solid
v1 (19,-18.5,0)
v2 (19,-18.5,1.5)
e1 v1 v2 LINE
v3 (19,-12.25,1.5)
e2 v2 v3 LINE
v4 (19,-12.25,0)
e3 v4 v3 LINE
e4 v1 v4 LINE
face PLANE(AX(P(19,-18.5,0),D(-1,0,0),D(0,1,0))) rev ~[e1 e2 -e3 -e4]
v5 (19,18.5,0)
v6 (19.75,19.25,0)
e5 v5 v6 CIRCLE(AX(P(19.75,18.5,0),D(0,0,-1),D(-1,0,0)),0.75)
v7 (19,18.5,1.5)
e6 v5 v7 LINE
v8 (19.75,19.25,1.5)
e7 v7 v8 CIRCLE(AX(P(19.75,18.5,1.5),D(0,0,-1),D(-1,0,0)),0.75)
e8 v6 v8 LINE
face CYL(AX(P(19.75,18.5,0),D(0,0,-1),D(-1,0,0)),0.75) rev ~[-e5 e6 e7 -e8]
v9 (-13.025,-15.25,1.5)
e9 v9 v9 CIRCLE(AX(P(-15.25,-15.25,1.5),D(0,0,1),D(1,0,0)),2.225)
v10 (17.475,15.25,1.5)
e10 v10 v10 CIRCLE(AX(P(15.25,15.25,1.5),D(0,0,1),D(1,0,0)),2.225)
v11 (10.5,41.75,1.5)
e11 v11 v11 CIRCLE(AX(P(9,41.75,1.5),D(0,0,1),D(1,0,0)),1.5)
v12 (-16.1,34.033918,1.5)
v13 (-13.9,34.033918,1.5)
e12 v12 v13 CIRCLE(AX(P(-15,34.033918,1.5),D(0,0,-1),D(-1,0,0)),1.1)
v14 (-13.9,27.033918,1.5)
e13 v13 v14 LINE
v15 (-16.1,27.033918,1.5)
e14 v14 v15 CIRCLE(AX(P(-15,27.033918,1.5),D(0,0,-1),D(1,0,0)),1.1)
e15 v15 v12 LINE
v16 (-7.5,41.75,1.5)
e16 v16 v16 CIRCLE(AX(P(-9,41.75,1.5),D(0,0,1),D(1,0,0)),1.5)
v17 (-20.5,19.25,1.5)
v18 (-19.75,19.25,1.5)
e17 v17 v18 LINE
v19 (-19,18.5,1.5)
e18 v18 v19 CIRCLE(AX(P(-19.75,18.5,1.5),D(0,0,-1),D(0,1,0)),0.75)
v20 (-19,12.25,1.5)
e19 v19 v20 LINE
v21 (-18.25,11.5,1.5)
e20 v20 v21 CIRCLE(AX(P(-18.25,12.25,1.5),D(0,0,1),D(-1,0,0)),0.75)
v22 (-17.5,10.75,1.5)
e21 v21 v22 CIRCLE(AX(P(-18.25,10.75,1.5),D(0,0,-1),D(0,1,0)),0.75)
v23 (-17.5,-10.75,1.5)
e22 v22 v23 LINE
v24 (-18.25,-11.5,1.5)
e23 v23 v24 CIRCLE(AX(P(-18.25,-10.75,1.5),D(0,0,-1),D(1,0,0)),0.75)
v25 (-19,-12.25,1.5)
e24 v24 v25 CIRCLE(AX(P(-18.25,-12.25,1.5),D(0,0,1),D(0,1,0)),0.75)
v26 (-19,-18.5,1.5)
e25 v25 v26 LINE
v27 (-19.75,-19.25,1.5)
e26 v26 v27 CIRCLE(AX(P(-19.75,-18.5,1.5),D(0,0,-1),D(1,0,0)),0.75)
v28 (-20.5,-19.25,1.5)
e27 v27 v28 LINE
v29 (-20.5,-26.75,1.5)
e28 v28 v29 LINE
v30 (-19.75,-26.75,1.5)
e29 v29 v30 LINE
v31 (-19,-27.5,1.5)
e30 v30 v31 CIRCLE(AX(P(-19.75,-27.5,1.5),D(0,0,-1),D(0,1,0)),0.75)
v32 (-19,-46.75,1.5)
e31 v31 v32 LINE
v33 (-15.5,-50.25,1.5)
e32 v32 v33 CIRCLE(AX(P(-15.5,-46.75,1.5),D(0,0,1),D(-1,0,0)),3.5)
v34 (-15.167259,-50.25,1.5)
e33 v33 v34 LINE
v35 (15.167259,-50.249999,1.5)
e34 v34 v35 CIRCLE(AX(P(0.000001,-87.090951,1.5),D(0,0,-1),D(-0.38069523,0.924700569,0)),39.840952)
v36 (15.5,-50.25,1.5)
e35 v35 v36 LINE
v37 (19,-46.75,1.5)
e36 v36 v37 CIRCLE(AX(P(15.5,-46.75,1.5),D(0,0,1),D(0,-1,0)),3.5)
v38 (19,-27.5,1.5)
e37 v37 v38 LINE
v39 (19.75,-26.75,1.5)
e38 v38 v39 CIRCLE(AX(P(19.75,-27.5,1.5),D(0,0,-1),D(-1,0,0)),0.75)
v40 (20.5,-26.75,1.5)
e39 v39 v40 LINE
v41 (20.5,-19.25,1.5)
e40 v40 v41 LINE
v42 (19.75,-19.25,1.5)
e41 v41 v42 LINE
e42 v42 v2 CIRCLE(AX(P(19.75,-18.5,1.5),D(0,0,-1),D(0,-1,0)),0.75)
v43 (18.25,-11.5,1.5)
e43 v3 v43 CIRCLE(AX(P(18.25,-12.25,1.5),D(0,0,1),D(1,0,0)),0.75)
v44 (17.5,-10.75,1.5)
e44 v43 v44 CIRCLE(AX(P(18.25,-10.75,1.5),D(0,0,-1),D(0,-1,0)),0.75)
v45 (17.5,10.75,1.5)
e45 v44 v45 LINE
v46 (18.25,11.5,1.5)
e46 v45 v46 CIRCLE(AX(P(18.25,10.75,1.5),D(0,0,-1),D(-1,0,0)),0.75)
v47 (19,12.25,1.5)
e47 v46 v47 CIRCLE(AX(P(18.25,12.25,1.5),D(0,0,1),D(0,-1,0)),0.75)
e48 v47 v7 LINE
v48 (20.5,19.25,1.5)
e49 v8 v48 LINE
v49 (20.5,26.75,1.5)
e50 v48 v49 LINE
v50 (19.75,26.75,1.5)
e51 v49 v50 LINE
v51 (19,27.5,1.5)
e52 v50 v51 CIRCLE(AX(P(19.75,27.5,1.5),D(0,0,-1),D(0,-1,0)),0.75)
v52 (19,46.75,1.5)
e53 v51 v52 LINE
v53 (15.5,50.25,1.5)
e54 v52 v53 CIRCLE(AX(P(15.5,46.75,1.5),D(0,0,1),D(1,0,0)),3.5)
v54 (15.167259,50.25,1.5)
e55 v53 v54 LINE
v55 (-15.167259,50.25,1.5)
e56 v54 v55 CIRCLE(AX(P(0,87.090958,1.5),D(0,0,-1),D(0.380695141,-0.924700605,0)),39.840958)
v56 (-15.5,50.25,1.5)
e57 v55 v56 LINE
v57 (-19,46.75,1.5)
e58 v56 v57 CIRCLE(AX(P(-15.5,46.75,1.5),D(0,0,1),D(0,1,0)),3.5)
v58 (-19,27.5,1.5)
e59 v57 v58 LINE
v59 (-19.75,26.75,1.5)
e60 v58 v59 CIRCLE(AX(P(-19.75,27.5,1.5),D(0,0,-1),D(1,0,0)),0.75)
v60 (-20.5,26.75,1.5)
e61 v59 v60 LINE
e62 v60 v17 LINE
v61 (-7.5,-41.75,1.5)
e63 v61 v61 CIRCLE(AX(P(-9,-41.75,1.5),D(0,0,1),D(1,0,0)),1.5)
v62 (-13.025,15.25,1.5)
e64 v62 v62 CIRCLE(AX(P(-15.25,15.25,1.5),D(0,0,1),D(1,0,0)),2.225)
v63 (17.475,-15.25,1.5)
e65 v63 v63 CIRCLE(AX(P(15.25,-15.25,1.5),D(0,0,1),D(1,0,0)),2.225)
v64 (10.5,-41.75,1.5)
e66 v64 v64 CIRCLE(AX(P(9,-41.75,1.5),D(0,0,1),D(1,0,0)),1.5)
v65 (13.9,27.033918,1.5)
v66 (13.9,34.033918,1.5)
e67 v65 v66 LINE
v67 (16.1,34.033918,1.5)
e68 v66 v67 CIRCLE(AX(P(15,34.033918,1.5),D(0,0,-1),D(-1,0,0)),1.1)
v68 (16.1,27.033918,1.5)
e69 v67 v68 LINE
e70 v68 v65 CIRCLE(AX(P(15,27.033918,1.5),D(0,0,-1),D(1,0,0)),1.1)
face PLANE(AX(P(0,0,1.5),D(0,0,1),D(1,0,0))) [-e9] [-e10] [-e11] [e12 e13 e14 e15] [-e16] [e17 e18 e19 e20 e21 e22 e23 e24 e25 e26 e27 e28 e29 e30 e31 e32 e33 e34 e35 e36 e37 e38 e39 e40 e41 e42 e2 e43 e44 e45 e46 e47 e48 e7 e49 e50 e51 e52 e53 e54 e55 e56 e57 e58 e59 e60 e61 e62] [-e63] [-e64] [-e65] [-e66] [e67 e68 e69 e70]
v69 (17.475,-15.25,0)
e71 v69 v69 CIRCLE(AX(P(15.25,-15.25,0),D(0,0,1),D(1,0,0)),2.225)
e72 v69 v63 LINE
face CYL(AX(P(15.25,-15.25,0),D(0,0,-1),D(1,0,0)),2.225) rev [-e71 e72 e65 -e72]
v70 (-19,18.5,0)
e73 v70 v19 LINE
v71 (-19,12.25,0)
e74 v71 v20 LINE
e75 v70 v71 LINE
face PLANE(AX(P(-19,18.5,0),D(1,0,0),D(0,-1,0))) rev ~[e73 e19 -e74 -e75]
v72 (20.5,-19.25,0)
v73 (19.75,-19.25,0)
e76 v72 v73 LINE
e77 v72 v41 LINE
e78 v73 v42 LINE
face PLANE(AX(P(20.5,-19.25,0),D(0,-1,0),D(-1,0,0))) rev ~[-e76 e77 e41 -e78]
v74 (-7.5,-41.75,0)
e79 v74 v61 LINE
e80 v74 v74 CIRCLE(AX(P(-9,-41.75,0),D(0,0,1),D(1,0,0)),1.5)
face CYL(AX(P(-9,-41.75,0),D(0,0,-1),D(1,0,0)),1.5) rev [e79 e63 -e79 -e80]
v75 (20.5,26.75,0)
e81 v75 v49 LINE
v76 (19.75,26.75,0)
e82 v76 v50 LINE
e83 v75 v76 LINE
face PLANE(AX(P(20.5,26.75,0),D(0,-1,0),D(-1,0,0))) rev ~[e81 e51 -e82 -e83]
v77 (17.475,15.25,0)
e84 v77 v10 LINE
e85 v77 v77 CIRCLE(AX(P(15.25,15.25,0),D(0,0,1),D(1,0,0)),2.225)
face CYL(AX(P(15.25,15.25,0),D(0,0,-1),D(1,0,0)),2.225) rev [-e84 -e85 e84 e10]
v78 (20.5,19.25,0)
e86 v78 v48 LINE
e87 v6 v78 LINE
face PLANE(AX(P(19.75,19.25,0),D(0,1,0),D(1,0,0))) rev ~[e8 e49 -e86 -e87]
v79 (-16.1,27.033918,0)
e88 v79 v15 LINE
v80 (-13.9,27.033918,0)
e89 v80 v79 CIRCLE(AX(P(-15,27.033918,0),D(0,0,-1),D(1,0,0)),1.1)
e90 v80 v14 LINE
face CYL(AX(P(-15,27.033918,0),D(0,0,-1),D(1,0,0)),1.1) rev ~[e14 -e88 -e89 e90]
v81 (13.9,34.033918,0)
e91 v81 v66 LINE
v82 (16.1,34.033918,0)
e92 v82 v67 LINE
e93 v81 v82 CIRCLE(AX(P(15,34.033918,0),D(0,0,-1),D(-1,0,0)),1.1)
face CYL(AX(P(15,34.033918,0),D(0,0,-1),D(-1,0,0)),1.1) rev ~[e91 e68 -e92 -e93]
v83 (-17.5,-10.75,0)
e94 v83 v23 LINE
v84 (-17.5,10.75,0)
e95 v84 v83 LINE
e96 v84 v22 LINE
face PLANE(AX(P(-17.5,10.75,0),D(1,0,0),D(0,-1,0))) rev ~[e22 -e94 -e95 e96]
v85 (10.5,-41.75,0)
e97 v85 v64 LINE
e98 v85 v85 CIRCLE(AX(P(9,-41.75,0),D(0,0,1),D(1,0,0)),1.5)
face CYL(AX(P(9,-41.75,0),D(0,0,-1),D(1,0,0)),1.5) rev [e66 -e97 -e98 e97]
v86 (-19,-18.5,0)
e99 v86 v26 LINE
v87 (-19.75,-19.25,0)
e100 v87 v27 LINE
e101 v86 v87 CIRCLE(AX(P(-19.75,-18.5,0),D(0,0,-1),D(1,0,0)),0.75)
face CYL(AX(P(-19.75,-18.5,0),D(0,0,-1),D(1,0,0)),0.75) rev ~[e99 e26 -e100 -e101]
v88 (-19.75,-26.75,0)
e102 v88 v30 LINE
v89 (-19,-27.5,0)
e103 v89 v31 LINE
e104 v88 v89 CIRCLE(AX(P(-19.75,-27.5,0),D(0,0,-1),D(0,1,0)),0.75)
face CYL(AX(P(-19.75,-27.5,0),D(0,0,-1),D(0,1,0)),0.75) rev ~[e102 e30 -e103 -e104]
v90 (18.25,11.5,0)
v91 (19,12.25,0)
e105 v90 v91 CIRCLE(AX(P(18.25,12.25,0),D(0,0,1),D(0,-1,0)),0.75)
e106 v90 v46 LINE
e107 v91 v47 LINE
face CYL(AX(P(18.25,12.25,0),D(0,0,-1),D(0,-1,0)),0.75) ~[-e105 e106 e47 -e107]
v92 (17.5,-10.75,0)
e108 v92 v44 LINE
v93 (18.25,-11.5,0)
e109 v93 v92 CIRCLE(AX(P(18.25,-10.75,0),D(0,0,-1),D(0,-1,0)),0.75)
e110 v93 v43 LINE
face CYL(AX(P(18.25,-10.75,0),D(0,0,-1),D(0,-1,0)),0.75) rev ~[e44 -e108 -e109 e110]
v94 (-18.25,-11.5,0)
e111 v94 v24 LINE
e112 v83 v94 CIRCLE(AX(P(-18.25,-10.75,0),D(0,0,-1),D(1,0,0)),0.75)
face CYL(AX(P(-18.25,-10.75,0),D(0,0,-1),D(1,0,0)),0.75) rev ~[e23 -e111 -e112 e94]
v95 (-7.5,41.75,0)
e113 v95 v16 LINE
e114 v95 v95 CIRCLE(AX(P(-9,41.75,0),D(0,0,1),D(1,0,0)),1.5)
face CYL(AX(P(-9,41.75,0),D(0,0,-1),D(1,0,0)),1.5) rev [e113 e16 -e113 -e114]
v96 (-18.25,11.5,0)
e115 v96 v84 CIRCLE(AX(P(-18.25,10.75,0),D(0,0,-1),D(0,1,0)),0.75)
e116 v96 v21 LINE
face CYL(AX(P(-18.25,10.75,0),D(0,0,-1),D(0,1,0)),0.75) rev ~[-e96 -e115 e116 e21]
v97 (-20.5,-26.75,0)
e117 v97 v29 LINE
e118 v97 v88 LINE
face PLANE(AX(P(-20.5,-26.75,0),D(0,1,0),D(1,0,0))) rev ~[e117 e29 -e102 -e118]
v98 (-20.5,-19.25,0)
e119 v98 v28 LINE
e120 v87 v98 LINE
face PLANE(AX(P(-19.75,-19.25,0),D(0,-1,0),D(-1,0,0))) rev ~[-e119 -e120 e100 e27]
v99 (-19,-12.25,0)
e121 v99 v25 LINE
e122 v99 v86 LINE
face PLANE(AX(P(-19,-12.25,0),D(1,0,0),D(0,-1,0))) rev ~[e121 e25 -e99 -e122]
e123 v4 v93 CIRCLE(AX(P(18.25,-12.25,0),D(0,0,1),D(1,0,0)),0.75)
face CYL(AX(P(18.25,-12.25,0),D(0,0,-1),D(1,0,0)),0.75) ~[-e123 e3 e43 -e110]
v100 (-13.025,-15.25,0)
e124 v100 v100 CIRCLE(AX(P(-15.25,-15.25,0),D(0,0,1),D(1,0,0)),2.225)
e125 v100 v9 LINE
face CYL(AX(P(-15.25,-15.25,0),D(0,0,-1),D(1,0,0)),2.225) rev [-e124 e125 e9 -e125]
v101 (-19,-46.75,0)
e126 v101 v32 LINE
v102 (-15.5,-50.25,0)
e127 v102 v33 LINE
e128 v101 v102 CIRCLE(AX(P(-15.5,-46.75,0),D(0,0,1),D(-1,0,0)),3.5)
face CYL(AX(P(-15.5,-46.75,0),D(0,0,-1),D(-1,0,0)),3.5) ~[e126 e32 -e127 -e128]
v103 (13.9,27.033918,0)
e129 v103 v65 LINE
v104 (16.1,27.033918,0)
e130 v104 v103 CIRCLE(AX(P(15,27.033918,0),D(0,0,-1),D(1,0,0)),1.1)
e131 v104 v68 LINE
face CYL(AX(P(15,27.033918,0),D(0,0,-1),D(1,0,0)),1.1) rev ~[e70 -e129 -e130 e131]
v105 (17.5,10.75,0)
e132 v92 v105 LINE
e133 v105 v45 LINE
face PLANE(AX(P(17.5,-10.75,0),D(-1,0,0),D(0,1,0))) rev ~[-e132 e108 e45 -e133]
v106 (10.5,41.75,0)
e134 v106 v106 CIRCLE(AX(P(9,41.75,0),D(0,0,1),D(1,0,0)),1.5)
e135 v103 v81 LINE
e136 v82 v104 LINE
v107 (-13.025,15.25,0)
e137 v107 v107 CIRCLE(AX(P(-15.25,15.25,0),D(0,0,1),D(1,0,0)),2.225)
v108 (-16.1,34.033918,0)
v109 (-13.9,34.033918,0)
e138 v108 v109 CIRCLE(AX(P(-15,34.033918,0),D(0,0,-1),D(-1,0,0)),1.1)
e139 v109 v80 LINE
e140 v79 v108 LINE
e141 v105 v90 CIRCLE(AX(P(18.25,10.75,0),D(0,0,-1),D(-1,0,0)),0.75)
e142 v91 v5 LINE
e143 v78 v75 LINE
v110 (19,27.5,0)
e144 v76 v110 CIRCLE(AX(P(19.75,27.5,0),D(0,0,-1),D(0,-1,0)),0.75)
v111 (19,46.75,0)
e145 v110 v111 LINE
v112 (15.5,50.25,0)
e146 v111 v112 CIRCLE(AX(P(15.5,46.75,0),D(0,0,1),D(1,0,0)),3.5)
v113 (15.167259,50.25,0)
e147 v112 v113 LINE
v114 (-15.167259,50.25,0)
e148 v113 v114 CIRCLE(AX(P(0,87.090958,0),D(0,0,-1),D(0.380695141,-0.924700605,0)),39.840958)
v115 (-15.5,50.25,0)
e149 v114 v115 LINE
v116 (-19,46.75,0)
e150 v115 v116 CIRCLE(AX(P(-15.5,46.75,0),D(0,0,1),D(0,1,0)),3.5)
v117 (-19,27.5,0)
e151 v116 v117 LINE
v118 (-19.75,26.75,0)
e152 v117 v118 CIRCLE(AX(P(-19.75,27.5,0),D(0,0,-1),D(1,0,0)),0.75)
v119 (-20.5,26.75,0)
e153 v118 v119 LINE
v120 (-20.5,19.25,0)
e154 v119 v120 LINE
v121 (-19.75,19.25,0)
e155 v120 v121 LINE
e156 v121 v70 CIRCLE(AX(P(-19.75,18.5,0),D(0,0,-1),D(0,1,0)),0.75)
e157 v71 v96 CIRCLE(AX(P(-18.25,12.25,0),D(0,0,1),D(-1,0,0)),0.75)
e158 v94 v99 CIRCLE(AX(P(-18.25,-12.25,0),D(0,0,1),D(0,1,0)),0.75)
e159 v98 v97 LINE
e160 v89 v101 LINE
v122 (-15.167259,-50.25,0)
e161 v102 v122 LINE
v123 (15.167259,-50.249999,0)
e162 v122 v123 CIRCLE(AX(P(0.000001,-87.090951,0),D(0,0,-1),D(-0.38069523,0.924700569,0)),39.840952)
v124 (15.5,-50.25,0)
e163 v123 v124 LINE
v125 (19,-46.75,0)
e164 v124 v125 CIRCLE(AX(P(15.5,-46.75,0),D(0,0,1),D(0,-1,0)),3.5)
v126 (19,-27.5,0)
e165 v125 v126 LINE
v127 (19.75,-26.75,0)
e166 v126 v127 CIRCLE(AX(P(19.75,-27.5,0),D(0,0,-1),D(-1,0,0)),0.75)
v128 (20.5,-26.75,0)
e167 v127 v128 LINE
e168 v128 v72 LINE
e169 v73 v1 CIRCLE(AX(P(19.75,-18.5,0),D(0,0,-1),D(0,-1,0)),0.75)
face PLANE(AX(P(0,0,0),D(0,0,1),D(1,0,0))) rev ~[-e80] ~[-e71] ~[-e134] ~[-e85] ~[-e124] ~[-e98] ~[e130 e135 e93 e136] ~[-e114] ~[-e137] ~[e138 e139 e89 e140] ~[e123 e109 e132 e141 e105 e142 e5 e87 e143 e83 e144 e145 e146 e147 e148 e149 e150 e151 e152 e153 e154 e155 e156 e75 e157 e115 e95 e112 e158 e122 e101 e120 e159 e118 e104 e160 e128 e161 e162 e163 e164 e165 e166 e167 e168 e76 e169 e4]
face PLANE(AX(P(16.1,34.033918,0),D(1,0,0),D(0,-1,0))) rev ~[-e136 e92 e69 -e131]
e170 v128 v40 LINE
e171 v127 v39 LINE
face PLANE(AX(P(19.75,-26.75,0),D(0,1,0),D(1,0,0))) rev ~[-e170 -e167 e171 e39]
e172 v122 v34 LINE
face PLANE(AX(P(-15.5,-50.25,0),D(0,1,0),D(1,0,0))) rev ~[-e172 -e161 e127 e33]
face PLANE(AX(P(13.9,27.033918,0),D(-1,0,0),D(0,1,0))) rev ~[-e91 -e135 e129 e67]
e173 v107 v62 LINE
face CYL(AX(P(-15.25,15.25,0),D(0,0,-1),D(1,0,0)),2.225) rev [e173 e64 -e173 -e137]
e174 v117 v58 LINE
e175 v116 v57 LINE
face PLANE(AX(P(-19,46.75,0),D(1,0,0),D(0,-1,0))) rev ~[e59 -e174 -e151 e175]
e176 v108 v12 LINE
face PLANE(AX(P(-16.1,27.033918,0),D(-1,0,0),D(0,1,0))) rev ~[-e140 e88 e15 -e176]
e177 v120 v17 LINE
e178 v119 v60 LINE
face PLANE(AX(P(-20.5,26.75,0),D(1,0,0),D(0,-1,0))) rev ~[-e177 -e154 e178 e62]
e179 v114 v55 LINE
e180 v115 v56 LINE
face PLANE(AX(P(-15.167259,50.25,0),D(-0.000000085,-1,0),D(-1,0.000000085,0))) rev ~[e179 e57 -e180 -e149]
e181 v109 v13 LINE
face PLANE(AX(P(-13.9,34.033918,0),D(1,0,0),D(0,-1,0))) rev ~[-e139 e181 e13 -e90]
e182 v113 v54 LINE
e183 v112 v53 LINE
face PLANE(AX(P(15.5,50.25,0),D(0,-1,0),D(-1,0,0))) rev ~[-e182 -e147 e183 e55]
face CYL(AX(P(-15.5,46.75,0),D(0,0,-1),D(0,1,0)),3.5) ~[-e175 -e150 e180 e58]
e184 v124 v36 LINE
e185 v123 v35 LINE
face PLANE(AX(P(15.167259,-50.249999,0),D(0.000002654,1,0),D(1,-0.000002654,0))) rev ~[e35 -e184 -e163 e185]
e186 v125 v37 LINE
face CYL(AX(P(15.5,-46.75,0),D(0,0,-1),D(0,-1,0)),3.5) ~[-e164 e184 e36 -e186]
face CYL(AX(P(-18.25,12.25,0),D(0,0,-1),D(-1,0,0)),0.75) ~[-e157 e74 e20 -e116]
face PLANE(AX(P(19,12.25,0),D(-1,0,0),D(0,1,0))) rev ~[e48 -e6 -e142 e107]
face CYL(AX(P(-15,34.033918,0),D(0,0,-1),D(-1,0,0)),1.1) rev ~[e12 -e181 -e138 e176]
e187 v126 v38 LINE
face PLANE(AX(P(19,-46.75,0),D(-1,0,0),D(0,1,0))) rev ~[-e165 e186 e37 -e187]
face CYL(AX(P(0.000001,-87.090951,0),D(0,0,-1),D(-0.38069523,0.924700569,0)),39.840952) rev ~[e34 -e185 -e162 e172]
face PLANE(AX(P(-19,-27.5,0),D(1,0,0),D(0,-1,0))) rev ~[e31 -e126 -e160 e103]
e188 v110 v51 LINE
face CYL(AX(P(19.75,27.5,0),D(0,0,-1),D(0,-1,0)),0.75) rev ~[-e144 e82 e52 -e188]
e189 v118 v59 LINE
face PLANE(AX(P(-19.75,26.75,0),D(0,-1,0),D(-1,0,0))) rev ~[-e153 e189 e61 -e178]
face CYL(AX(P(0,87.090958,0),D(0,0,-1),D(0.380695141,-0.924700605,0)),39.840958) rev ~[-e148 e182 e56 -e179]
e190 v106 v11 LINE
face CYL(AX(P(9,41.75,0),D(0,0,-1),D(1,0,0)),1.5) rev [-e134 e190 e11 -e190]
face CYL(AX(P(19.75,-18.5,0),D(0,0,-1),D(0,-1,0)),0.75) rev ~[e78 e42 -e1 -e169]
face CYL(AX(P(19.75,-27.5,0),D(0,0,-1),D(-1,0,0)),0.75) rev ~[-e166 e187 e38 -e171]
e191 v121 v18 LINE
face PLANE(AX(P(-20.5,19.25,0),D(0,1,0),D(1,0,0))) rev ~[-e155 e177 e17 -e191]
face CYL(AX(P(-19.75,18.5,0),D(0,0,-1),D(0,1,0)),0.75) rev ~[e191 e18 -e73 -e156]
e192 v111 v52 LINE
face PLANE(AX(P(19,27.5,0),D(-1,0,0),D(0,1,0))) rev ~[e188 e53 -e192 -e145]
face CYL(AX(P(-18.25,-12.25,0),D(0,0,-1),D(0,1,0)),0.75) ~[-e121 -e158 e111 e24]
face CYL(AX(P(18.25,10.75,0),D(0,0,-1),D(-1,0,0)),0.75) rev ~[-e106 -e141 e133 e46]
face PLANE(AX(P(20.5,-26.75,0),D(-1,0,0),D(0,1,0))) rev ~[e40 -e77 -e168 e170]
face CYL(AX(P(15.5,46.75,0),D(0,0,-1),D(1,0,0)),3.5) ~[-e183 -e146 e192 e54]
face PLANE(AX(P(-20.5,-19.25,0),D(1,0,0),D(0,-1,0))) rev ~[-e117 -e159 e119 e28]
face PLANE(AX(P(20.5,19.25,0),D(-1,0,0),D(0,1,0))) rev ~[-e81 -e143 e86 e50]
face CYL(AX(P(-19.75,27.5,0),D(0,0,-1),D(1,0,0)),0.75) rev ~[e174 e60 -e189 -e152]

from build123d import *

# Parameters (mm, degrees)
F0_R     = 1.5
F0_R_2   = 2.225
F1_DEPTH = 1.5


# Not quite as in the source:
# - ends of sketch curves that miss each other by under 0.0002 mm in the source are joined


with BuildPart() as f1:
    # F0 (on Top) → F1 (new body)
    with BuildSketch(Plane.XY):
        with BuildLine():
            ThreePointArc((19.75, -19.25), (19.2196699141, -19.0303300859), (19, -18.5))
            Line((19, -18.5), (19, -12.25))
            ThreePointArc((19, -12.25), (18.7803300859, -11.7196699141), (18.25, -11.5))
            ThreePointArc((18.25, -11.5), (17.7196699141, -11.2803300859), (17.5, -10.75))
            Line((17.5, -10.75), (17.5, 10.75))
            ThreePointArc((17.5, 10.75), (17.7196699141, 11.2803300859), (18.25, 11.5))
            ThreePointArc((18.25, 11.5), (18.7803300859, 11.7196699141), (19, 12.25))
            Line((19, 12.25), (19, 18.5))
            ThreePointArc((19, 18.5), (19.2196699141, 19.0303300859), (19.75, 19.25))
            Line((19.75, 19.25), (20.5, 19.25))
            Line((20.5, 19.25), (20.5, 26.75))
            Line((20.5, 26.75), (19.75, 26.75))
            ThreePointArc((19.75, 26.75), (19.2196699141, 26.9696699141), (19, 27.5))
            Line((19, 27.5), (19, 46.75))
            ThreePointArc((19, 46.75), (17.9748737342, 49.2248737342), (15.5, 50.25))
            Line((15.5, 50.25), (15.167259, 50.25))
            ThreePointArc((15.167259, 50.25), (0, 47.25), (-15.1672590116, 50.2499999718))
            Line((-15.1672590116, 50.2499999718), (-15.5, 50.25))
            ThreePointArc((-15.5, 50.25), (-17.9748737342, 49.2248737342), (-19, 46.75))
            Line((-19, 46.75), (-19, 27.5))
            ThreePointArc((-19, 27.5), (-19.2196699141, 26.9696699141), (-19.75, 26.75))
            Line((-19.75, 26.75), (-20.5, 26.75))
            Line((-20.5, 26.75), (-20.5, 19.25))
            Line((-20.5, 19.25), (-19.75, 19.25))
            ThreePointArc((-19.75, 19.25), (-19.2196699141, 19.0303300859), (-19, 18.5))
            Line((-19, 18.5), (-19, 12.25))
            ThreePointArc((-19, 12.25), (-18.7803300859, 11.7196699141), (-18.25, 11.5))
            ThreePointArc((-18.25, 11.5), (-17.7196699141, 11.2803300859), (-17.5, 10.75))
            Line((-17.5, 10.75), (-17.5, -10.75))
            ThreePointArc((-17.5, -10.75), (-17.7196699141, -11.2803300859), (-18.25, -11.5))
            ThreePointArc((-18.25, -11.5), (-18.7803300859, -11.7196699141), (-19, -12.25))
            Line((-19, -12.25), (-19, -18.5))
            ThreePointArc((-19, -18.5), (-19.2196699141, -19.0303300859), (-19.75, -19.25))
            Line((-19.75, -19.25), (-20.5, -19.25))
            Line((-20.5, -19.25), (-20.5, -26.75))
            Line((-20.5, -26.75), (-19.75, -26.75))
            ThreePointArc((-19.75, -26.75), (-19.2196699141, -26.9696699141), (-19, -27.5))
            Line((-19, -27.5), (-19, -46.75))
            ThreePointArc((-19, -46.75), (-17.9748737342, -49.2248737342), (-15.5, -50.25))
            Line((-15.5, -50.25), (-15.167259, -50.25))
            ThreePointArc((-15.167259, -50.25), (0, -47.249999), (15.1672593636, -50.2499991168))
            Line((15.1672593636, -50.2499991168), (15.5, -50.25))
            ThreePointArc((15.5, -50.25), (17.9748737342, -49.2248737342), (19, -46.75))
            Line((19, -46.75), (19, -27.5))
            ThreePointArc((19, -27.5), (19.2196699141, -26.9696699141), (19.75, -26.75))
            Line((19.75, -26.75), (20.5, -26.75))
            Line((20.5, -26.75), (20.5, -19.25))
            Line((20.5, -19.25), (19.75, -19.25))
        make_face()
        with Locations((-9, -41.75)):
            Circle(F0_R, mode=Mode.SUBTRACT)
        with Locations((-15.25, -15.25)):
            Circle(F0_R_2, mode=Mode.SUBTRACT)
        with Locations((9, -41.75)):
            Circle(F0_R, mode=Mode.SUBTRACT)
        with Locations((15.25, -15.25)):
            Circle(F0_R_2, mode=Mode.SUBTRACT)
        with Locations((-15.25, 15.25)):
            Circle(F0_R_2, mode=Mode.SUBTRACT)
        with BuildLine():
            ThreePointArc((-16.1, 34.033918), (-15, 35.133918), (-13.9, 34.033918))
            Line((-13.9, 34.033918), (-13.9, 27.033918))
            ThreePointArc((-13.9, 27.033918), (-15, 25.933918), (-16.1, 27.033918))
            Line((-16.1, 27.033918), (-16.1, 34.033918))
        make_face(mode=Mode.SUBTRACT)
        with Locations((-9, 41.75)):
            Circle(F0_R, mode=Mode.SUBTRACT)
        with Locations((15.25, 15.25)):
            Circle(F0_R_2, mode=Mode.SUBTRACT)
        with Locations((9, 41.75)):
            Circle(F0_R, mode=Mode.SUBTRACT)
        with BuildLine():
            ThreePointArc((13.9, 34.033918), (15, 35.133918), (16.1, 34.033918))
            Line((16.1, 34.033918), (16.1, 27.033918))
            ThreePointArc((16.1, 27.033918), (15, 25.933918), (13.9, 27.033918))
            Line((13.9, 27.033918), (13.9, 34.033918))
        make_face(mode=Mode.SUBTRACT)
    extrude(amount=F1_DEPTH)


solid = f1.part
